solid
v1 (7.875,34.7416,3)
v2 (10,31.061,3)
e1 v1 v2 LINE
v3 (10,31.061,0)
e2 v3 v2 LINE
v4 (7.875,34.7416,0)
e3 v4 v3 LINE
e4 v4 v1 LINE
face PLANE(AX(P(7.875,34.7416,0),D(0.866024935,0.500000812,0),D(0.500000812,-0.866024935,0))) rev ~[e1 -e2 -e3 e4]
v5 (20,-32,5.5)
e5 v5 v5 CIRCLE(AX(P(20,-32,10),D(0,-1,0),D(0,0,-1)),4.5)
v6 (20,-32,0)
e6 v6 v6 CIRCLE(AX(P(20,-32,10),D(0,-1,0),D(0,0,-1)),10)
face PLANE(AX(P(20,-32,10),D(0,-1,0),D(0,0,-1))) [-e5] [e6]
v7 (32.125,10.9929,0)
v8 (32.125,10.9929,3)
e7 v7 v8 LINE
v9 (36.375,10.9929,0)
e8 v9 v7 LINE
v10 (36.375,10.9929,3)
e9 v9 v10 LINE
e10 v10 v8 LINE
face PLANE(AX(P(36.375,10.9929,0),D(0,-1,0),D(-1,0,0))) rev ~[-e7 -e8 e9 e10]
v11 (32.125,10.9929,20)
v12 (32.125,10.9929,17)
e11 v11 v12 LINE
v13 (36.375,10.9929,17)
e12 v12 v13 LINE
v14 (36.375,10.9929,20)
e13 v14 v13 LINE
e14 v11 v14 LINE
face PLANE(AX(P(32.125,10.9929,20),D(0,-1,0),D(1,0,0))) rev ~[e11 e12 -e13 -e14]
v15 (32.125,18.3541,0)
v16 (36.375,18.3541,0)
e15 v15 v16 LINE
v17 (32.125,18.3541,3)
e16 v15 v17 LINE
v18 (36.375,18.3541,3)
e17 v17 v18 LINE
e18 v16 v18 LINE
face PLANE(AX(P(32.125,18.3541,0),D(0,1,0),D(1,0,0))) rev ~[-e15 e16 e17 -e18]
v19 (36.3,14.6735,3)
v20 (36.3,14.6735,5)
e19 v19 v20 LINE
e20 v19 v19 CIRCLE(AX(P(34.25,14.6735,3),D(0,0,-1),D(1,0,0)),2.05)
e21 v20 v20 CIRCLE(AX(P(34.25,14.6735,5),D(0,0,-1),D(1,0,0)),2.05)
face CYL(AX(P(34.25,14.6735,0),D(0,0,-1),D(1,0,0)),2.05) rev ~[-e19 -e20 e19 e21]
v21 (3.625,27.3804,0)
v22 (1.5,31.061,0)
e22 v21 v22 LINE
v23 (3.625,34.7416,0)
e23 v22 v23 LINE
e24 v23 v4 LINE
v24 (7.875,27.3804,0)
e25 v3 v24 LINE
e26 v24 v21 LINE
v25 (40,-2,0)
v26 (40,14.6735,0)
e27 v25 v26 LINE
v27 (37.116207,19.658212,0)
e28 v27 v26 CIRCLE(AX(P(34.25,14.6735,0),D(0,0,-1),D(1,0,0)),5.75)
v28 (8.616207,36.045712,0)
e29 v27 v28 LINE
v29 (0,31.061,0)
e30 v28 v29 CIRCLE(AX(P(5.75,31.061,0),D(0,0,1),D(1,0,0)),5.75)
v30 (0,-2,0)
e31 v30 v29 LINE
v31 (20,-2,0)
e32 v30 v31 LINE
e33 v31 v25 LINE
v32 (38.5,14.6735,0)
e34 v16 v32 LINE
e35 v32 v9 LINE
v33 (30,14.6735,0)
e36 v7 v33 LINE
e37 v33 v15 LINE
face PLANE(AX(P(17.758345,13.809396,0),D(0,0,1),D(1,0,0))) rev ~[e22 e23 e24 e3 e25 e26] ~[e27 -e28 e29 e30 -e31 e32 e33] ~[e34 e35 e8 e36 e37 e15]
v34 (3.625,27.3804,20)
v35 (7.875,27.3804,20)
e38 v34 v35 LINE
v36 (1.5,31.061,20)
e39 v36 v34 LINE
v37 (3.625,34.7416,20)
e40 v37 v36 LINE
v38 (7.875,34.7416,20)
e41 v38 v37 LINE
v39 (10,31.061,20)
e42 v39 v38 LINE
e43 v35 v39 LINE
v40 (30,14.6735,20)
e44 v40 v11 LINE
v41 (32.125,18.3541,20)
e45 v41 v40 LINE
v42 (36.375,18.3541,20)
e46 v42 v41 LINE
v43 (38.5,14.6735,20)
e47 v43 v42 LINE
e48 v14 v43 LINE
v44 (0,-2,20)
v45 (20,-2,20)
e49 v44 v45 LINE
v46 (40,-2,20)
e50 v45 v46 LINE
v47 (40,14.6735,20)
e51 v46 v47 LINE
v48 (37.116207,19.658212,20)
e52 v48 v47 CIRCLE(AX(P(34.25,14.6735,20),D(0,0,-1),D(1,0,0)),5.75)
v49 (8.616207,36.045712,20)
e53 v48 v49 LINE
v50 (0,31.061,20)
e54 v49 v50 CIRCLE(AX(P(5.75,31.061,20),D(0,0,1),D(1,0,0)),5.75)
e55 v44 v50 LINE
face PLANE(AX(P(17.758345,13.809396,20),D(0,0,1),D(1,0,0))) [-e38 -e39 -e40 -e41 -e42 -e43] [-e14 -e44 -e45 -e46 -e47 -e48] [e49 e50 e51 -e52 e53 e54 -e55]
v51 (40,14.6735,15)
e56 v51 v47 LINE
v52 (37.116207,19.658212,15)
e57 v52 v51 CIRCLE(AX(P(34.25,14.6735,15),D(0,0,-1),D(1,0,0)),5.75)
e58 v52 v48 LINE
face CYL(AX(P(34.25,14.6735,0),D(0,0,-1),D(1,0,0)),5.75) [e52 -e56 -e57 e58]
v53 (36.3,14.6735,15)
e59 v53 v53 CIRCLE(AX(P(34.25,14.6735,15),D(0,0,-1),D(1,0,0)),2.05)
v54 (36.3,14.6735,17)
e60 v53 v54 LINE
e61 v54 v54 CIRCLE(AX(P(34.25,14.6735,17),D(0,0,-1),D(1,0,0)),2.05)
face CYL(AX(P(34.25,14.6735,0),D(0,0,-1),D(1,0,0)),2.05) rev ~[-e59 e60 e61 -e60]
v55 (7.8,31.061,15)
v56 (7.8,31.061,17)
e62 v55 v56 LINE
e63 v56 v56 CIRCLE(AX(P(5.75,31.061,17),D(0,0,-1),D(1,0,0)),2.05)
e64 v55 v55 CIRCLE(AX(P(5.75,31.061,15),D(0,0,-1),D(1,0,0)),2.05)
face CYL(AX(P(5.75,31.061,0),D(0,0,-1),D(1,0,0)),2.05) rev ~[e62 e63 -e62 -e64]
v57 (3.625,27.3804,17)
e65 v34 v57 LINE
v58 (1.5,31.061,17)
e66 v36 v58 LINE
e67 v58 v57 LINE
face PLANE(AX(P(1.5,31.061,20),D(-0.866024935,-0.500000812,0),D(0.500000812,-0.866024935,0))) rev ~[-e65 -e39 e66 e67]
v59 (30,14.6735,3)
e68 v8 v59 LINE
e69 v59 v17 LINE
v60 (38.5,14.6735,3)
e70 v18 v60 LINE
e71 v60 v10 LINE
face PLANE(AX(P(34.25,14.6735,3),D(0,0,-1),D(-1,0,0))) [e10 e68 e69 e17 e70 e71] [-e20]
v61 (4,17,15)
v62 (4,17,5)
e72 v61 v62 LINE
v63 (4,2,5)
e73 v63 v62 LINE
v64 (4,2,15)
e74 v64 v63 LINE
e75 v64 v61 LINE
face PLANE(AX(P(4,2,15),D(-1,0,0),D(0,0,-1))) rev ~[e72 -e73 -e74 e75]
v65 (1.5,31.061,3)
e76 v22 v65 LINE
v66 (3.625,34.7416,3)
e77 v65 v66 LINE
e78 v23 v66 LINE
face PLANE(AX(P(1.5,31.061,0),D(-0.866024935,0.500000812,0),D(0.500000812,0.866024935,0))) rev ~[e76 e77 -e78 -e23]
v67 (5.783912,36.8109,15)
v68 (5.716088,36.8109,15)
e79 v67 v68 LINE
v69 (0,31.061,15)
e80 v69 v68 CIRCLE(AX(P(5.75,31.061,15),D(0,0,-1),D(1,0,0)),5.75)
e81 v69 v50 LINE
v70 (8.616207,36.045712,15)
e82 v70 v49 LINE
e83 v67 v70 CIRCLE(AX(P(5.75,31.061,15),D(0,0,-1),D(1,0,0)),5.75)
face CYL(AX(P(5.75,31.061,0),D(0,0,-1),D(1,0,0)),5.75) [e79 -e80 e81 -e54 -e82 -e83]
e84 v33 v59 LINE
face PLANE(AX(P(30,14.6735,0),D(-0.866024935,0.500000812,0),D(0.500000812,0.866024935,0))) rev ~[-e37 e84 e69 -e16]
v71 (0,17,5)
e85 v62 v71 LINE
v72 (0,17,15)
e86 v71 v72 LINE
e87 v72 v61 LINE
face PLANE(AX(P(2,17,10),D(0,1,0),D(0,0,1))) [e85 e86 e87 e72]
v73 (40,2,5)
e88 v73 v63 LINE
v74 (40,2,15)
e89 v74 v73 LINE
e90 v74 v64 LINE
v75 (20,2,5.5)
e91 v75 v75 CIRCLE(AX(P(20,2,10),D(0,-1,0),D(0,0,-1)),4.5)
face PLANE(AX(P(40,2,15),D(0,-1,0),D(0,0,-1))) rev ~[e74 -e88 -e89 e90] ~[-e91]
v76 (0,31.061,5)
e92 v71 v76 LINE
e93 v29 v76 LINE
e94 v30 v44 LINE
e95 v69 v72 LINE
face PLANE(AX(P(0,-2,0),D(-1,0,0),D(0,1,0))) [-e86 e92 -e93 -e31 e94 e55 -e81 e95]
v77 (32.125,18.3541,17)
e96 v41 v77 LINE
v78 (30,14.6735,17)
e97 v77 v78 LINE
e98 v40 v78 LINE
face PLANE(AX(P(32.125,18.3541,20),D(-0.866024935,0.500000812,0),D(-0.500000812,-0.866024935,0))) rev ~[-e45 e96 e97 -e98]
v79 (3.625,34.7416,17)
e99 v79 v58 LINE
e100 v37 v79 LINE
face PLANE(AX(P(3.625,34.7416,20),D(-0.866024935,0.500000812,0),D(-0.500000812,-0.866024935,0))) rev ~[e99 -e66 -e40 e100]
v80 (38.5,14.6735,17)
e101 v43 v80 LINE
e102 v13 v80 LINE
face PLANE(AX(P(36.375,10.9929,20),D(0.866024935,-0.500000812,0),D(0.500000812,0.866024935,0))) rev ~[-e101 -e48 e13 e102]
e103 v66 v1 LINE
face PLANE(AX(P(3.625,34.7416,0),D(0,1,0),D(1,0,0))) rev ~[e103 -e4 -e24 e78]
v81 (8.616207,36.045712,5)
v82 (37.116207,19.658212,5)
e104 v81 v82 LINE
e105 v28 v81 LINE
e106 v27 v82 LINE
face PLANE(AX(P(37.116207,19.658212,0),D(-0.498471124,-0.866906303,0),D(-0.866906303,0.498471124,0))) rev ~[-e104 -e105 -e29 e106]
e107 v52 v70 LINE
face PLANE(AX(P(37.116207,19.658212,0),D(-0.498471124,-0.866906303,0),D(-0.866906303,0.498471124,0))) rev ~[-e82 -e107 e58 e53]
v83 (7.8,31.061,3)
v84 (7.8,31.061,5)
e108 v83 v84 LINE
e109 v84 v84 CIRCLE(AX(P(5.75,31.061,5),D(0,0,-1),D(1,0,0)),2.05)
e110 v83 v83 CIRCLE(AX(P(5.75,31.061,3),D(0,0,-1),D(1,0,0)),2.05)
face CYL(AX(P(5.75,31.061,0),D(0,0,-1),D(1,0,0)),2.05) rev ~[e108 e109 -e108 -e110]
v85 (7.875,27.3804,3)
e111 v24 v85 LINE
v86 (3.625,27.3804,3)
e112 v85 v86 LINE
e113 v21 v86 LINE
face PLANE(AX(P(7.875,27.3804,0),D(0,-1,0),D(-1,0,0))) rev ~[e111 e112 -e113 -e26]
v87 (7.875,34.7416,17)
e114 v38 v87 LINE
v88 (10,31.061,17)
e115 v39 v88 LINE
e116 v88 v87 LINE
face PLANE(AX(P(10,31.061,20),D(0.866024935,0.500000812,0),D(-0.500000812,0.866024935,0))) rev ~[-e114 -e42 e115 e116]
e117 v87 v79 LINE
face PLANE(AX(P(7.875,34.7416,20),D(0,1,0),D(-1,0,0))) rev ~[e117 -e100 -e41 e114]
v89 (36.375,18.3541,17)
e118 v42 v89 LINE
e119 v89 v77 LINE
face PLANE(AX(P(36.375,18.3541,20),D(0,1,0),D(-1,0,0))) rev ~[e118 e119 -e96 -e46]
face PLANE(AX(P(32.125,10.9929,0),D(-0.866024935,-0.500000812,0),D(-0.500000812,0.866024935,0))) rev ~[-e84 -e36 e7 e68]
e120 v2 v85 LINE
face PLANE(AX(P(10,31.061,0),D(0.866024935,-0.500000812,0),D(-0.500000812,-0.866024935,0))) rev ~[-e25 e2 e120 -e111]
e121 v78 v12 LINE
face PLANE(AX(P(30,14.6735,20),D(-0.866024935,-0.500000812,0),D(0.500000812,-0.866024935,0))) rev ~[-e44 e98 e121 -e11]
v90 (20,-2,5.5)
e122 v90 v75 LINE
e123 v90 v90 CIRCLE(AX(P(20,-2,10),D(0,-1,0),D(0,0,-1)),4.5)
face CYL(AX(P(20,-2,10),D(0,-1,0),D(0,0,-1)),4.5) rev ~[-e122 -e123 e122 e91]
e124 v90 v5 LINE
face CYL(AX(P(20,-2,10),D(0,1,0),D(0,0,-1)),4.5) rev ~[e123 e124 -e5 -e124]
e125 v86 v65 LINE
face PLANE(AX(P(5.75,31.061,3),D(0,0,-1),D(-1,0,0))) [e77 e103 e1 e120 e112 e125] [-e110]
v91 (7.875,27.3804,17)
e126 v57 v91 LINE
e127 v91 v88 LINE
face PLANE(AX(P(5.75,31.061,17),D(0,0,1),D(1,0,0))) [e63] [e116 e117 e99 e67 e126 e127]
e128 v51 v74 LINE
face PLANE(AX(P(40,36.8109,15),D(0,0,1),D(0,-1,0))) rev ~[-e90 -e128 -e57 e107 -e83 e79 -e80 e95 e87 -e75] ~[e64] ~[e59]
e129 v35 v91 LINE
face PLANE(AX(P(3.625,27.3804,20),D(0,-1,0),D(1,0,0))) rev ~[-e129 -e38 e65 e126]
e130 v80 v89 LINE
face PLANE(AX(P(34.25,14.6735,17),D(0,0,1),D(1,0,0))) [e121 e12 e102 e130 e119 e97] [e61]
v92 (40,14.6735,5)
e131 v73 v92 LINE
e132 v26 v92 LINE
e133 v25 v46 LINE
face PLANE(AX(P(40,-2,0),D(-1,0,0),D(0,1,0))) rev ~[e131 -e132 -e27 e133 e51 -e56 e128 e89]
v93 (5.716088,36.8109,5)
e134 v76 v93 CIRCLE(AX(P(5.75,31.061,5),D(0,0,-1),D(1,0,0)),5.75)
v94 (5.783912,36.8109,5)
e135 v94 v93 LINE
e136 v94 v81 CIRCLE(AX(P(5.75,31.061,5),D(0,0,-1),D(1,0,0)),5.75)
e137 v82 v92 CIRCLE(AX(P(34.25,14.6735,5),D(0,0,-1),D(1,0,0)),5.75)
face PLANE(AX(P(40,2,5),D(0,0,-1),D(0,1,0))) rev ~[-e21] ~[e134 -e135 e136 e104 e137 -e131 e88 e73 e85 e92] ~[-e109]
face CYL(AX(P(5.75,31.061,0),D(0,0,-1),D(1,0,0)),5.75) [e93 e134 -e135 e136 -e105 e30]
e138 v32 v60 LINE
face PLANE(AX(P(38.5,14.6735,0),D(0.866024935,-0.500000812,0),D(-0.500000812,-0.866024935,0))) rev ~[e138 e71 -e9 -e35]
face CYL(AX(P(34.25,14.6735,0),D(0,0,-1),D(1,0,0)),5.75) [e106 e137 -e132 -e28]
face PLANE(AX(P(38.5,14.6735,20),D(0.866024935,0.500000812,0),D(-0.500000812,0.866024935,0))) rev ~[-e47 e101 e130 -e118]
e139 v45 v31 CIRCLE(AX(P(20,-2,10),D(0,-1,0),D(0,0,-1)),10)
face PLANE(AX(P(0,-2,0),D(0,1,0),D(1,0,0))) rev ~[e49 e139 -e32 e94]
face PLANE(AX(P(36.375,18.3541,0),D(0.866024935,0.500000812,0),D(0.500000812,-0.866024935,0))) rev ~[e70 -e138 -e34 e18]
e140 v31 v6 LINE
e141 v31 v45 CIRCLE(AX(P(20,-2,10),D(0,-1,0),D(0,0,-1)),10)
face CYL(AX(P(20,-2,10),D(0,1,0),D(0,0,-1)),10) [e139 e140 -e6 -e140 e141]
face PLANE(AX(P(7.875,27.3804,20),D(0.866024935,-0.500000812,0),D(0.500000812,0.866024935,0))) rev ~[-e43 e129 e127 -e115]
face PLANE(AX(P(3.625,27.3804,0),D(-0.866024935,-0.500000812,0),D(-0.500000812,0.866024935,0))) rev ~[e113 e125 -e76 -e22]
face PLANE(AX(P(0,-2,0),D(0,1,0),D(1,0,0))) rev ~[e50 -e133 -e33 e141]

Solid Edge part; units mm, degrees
sketch "Sketch1" plane through (0, 0, 0) normal (0, 0, 1) x (1, 0, 0)
  line L0 (37.1162, 19.6582) -> (8.6162, 36.0457)
  line L1 (0, -2) -> (0, 31.061)
  line L2 (0, -2) -> (40, -2)
  line L3 (40, -2) -> (40, 14.6735)
  arc A0 (8.6162, 36.0457) -> (0, 31.061) centre (5.75, 31.061) ccw
  arc A1 (37.1162, 19.6582) -> (40, 14.6735) centre (34.25, 14.6735) cw
  circle A2 centre (34.25, 14.6735) radius 2.05
  circle A3 centre (5.75, 31.061) radius 2.05
extrude "Protrusion1" add sketch "Sketch1" along normal blind 20
sketch "Sketch2" plane through (20, 18.4055, 0) normal (0, 0, -1) x (1, 0, 0)
  line L0 (-12.125, -8.9749) -> (-16.375, -8.9749)
  line L1 (-16.375, -8.9749) -> (-18.5, -12.6555)
  line L2 (-18.5, -12.6555) -> (-16.375, -16.3361)
  line L3 (-16.375, -16.3361) -> (-12.125, -16.3361)
  line L4 (-12.125, -16.3361) -> (-10, -12.6555)
  line L5 (-10, -12.6555) -> (-12.125, -8.9749)
  line L6 (12.125, 7.4126) -> (10, 3.732)
  line L7 (10, 3.732) -> (12.125, 0.0514)
  line L8 (12.125, 0.0514) -> (16.375, 0.0514)
  line L9 (16.375, 0.0514) -> (18.5, 3.732)
  line L10 (18.5, 3.732) -> (16.375, 7.4126)
  line L11 (16.375, 7.4126) -> (12.125, 7.4126)
extrude "ExtrudedCutout_1" cut sketch "Sketch2" against normal blind 3
sketch "Sketch3" plane through (20, 17.4055, 20) normal (0, 0, 1) x (1, 0, 0)
  line L0 (-10, 13.6555) -> (-12.125, 17.3361)
  line L1 (-12.125, 17.3361) -> (-16.375, 17.3361)
  line L2 (-16.375, 17.3361) -> (-18.5, 13.6555)
  line L3 (-18.5, 13.6555) -> (-16.375, 9.9749)
  line L4 (-16.375, 9.9749) -> (-12.125, 9.9749)
  line L5 (-12.125, 9.9749) -> (-10, 13.6555)
  line L6 (18.5, -2.732) -> (16.375, 0.9486)
  line L7 (16.375, 0.9486) -> (12.125, 0.9486)
  line L8 (12.125, 0.9486) -> (10, -2.732)
  line L9 (10, -2.732) -> (12.125, -6.4126)
  line L10 (12.125, -6.4126) -> (16.375, -6.4126)
  line L11 (16.375, -6.4126) -> (18.5, -2.732)
extrude "ExtrudedCutout_2" cut sketch "Sketch3" against normal blind 3
sketch "Sketch4" plane through (40, 6.3367, 10) normal (1, 0, 0) x (0, 0, -1)
  line L0 (-5, -4.3367) -> (5, -4.3367)
  line L1 (5, -4.3367) -> (5, 30.4742)
  line L2 (5, 30.4742) -> (-5, 30.4742)
  line L3 (-5, 30.4742) -> (-5, -4.3367)
extrude "ExtrudedCutout_3" cut sketch "Sketch4" against normal blind 40
sketch "Sketch5" plane through (20, -2, 10) normal (0, -1, 0) x (0, 0, -1)
  circle A0 centre (0, 0) radius 4.5
extrude "ExtrudedCutout_4" cut sketch "Sketch5" against normal blind 4
sketch "Sketch6" plane through (20, -2, 10) normal (0, -1, 0) x (0, 0, -1)
  circle A0 centre (0, 0) radius 10
  circle A1 centre (0, 0) radius 4.5
extrude "ExtrudedProtrusion_2" add sketch "Sketch6" along normal blind 30
sketch "Sketch7" plane through (20, 2, 10) normal (0, 1, 0) x (1, 0, 0)
  line L0 (-20, -5) -> (-16, -5)
  line L1 (-16, -5) -> (-16, 5)
  line L2 (-16, 5) -> (-20, 5)
  line L3 (-20, 5) -> (-20, -5)
extrude "ExtrudedProtrusion_3" add sketch "Sketch7" along normal blind 15
